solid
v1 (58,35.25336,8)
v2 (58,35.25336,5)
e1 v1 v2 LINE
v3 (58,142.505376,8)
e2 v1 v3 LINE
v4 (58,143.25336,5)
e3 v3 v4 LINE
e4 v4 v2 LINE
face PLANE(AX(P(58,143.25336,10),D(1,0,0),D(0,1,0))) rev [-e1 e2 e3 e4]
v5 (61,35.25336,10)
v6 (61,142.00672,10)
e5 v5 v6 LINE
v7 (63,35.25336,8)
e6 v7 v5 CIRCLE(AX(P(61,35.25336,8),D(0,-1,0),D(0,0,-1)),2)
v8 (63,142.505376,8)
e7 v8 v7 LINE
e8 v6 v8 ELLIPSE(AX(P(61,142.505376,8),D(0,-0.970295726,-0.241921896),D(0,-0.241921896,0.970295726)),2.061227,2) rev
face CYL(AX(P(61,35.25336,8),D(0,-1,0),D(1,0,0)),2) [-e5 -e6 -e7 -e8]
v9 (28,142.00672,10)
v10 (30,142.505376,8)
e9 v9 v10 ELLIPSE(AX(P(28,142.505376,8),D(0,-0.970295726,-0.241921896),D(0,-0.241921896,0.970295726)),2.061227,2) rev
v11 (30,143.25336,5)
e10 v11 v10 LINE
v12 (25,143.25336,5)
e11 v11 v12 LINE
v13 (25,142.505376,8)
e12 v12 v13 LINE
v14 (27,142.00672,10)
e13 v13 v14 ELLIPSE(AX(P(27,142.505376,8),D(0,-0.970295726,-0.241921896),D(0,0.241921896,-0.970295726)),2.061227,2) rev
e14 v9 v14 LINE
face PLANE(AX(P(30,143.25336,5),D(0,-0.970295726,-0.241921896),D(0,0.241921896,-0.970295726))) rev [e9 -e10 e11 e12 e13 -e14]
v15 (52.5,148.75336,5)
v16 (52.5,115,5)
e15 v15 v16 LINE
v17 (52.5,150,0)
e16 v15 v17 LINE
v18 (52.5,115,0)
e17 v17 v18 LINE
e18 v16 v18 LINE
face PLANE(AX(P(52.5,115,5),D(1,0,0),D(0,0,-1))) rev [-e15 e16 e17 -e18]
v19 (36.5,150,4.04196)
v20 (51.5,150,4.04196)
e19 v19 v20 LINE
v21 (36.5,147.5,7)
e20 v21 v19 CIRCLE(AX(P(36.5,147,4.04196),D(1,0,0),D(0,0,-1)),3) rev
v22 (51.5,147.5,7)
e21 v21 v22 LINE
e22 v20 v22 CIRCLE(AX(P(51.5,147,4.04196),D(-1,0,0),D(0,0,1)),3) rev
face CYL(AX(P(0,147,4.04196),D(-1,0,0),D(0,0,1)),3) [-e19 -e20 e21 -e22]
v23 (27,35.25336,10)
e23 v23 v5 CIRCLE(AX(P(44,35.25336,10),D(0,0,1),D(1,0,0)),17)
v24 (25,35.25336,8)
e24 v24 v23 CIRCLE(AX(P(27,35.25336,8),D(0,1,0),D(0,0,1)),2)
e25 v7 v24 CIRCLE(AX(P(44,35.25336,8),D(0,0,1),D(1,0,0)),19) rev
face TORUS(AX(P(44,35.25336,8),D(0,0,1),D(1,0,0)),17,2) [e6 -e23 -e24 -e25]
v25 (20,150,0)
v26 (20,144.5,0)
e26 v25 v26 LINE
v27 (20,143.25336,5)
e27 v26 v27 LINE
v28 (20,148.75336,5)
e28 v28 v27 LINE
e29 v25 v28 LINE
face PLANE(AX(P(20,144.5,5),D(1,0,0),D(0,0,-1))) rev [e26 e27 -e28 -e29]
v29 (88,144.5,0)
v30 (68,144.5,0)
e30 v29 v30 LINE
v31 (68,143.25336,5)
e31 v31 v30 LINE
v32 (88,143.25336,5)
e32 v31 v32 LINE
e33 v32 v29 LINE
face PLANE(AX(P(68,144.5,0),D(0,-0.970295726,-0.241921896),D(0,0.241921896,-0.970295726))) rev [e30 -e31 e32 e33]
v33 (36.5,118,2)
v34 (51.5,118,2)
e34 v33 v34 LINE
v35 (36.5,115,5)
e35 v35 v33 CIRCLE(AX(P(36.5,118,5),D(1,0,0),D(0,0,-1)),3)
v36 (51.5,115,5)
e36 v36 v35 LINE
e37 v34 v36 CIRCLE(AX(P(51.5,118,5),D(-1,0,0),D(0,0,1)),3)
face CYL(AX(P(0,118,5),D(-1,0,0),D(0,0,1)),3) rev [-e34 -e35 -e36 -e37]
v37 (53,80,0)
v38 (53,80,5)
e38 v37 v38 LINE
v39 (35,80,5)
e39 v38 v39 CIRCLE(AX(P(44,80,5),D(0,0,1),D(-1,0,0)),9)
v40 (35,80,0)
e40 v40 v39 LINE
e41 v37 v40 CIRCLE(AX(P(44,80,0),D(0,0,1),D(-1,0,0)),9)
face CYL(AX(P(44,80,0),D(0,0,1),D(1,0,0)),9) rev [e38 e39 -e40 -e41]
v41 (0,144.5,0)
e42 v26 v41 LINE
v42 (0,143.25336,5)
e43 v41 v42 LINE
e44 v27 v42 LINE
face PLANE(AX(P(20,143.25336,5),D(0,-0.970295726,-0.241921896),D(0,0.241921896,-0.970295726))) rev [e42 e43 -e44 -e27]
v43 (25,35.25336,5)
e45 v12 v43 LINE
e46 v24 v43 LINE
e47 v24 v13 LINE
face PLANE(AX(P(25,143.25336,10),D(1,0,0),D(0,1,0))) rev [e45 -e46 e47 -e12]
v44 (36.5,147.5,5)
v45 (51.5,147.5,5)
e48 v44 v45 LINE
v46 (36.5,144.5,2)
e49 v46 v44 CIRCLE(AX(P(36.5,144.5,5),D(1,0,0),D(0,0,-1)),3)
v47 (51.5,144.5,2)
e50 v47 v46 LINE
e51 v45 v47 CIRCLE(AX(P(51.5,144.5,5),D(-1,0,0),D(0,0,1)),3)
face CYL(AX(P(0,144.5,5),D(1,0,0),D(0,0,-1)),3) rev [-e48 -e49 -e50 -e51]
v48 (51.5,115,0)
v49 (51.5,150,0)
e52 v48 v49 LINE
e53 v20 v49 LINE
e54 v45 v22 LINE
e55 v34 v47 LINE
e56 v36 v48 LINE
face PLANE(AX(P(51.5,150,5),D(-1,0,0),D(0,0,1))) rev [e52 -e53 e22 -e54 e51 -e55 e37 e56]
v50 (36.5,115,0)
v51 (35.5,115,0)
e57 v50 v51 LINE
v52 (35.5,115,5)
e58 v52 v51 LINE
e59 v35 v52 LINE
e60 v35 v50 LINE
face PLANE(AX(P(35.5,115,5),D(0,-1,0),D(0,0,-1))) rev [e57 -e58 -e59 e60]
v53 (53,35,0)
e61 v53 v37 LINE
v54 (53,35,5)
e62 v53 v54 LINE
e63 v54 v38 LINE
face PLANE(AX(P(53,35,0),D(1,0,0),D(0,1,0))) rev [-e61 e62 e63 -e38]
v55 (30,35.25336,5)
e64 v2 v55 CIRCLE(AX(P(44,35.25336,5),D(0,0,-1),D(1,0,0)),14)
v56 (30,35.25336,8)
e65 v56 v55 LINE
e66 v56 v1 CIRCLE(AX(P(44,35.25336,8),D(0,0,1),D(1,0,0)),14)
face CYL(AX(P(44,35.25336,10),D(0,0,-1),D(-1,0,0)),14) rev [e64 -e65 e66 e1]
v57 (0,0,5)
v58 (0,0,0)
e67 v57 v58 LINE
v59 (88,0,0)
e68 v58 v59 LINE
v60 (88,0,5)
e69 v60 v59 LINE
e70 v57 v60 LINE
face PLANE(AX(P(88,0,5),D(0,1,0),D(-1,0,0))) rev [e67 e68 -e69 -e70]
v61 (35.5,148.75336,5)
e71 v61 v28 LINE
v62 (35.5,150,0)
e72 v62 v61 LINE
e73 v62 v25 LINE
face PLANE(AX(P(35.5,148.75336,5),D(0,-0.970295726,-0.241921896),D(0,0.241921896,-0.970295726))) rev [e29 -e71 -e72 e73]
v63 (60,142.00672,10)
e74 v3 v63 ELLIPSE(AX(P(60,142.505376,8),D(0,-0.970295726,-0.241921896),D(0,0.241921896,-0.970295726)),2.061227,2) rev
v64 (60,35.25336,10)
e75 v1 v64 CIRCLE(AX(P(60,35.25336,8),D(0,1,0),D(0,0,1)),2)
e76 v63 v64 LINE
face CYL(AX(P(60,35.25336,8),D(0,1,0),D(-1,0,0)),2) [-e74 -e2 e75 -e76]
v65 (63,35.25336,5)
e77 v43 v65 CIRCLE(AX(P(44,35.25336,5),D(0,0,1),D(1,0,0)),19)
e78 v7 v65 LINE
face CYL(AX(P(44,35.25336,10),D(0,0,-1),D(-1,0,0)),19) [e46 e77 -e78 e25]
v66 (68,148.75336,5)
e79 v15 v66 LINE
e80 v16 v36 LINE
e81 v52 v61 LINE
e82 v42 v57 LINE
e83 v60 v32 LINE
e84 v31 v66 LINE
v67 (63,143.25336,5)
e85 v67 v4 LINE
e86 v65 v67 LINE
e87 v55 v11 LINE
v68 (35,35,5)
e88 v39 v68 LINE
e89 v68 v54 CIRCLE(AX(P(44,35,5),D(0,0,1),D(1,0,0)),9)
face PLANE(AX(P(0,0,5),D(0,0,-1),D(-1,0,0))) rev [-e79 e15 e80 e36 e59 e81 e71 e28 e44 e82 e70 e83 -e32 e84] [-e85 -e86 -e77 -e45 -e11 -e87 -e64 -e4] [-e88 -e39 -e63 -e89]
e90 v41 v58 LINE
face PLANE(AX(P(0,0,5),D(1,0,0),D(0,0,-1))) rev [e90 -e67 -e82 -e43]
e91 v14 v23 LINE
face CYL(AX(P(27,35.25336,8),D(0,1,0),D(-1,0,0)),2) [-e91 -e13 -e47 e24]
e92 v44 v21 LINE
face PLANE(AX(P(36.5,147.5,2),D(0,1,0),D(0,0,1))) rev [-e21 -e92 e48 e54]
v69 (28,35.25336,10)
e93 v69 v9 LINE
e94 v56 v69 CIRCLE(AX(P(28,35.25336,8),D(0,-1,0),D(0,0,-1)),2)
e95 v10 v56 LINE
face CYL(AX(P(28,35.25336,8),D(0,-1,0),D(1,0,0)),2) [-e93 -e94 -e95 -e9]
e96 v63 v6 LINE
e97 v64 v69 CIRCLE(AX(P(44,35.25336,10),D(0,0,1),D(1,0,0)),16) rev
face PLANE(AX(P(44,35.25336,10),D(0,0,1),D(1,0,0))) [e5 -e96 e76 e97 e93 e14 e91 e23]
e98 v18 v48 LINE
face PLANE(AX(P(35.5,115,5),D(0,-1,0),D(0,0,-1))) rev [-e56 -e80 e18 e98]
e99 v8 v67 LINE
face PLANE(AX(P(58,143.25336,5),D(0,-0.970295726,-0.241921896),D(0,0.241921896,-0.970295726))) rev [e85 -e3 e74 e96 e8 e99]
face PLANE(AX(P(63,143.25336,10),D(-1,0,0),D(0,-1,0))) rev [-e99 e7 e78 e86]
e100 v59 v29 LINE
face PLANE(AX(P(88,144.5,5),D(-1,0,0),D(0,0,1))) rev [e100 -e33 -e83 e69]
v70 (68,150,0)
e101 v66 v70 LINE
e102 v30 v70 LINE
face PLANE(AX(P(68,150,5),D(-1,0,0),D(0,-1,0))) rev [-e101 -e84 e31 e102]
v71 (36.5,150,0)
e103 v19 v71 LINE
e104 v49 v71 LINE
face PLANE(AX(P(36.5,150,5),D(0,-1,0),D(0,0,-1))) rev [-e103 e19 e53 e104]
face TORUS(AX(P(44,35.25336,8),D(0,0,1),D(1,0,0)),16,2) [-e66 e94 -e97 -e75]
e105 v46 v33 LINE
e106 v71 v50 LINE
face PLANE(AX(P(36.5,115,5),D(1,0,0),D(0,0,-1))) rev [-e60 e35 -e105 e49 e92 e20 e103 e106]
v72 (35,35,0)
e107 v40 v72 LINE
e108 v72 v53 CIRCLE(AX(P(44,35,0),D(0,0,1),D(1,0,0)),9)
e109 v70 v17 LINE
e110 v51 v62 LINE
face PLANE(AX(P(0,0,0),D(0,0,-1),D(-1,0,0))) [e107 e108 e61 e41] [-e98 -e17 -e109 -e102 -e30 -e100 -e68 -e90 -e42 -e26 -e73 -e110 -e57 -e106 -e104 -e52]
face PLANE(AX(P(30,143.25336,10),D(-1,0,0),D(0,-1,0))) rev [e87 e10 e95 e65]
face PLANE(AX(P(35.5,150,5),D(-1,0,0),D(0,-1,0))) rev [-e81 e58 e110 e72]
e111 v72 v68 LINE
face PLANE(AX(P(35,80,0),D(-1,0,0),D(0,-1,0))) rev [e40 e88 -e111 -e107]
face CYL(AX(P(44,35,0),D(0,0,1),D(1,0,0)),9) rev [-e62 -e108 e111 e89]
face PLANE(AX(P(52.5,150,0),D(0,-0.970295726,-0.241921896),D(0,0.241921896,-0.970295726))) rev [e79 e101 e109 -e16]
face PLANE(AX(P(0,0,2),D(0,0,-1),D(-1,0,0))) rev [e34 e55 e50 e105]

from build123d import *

# Parameters (mm, degrees)
BOSS_EXTRUDE1_DEPTH = 5
CUT_EXTRUDE1_DEPTH  = 20
CUT_EXTRUDE2_DEPTH  = 20
CUT_EXTRUDE3_DEPTH  = 15.5
CUT_EXTRUDE4_DEPTH  = 15.5
SKETCH6_W           = 15
SKETCH6_H           = 32.5
CUT_EXTRUDE5_DEPTH  = 3
FILLET1_R           = 3
SKETCH7_W           = 15
SKETCH7_H           = 2.5
BOSS_EXTRUDE2_DEPTH = 2
FILLET2_R           = 3
FILLET3_R           = 3
CUT_EXTRUDE6_DEPTH  = 5
BOSS_EXTRUDE3_DEPTH = 5
CUT_EXTRUDE7_DEPTH  = 5
CUT_EXTRUDE8_DEPTH  = 5
FILLET4_R           = 2
FILLET5_R           = 2


# Some blends are built 0.0001 mm under size
with BuildPart() as part:
    # Sketch1 → Boss-Extrude1 (new body)
    with BuildSketch(Plane.XY):
        Polygon((0, 0), (0, 144.5), (20, 144.5), (20, 150), (35.5, 150), (35.5, 115), (36.5, 115), (36.5, 150), (51.5, 150), (51.5, 115), (52.5, 115), (52.5, 150), (68, 150), (68, 144.5), (88, 144.5), (88, 0), align=None)
    extrude(amount=BOSS_EXTRUDE1_DEPTH)

    # Sketch2 → Cut-Extrude1 (cut)
    with BuildSketch(Plane(origin=(88, 0, 0), x_dir=(0, 0, -1), z_dir=(1, 0, 0))):
        Polygon((-5, 144.5), (0, 144.5), (-5, 143.253359986), align=None)
    extrude(amount=-CUT_EXTRUDE1_DEPTH, mode=Mode.SUBTRACT)

    # Sketch3 → Cut-Extrude2 (cut)
    with BuildSketch(Plane.ZY):
        Polygon((5, 144.5), (0, 144.5), (5, 143.253359986), align=None)
    extrude(amount=-CUT_EXTRUDE2_DEPTH, mode=Mode.SUBTRACT)

    # Sketch4 → Cut-Extrude3 (cut)
    with BuildSketch(Plane(origin=(68, 0, 0), x_dir=(0, 0, -1), z_dir=(1, 0, 0))):
        Polygon((0, 150), (-5, 148.753359986), (-5, 150), align=None)
    extrude(amount=-CUT_EXTRUDE3_DEPTH, mode=Mode.SUBTRACT)

    # Sketch5 → Cut-Extrude4 (cut)
    with BuildSketch(Plane.ZY.offset(-20)):
        Polygon((0, 150), (5, 150), (5, 148.753359986), align=None)
    extrude(amount=-CUT_EXTRUDE4_DEPTH, mode=Mode.SUBTRACT)

    # Sketch6 → Cut-Extrude5 (cut)
    with BuildSketch(Plane.XY.offset(5)):
        with Locations((44, 131.25)):
            Rectangle(SKETCH6_W, SKETCH6_H)
    extrude(amount=-CUT_EXTRUDE5_DEPTH, mode=Mode.SUBTRACT)

    # Fillet1
    fillet1_edges = [part.edges().sort_by_distance(p)[0] for p in [
        (44, 115, 2),
    ]]
    fillet(fillet1_edges, radius=FILLET1_R - 0.0001)  # a hair under: the kernel refuses the full size

    # Sketch7 → Boss-Extrude2 (add)
    with BuildSketch(Plane.XY.offset(5)):
        with Locations((44, 148.75)):
            Rectangle(SKETCH7_W, SKETCH7_H)
    extrude(amount=BOSS_EXTRUDE2_DEPTH)

    # Fillet2
    fillet2_edges = [part.edges().sort_by_distance(p)[0] for p in [
        (44, 147.5, 2),
    ]]
    fillet(fillet2_edges, radius=FILLET2_R)

    # Fillet3
    # the kernel refuses this fillet: 3 mm, written as the material it takes off along each edge
    with BuildSketch(Plane(origin=(58.895099729, 150, 7), x_dir=(0, -1, 0), z_dir=(-1, 0, 0))) as fillet3_piece_1:
        with BuildLine():
            CenterArc((3, -2.958039892), FILLET3_R, 99.594068227, 80.405931773)
            Line((0, -2.958039892), (-0.06, -2.958039892))
            Line((-0.06, -2.958039892), (-0.06, 0))
            Line((-0.06, 0), (0, 0.06))
            ThreePointArc((0, 0.06), (1.25, 0.06), (2.49, 0.059160798))
            Line((2.49, 0.059160798), (2.5, 0))
        make_face()
    extrude(amount=29.790199458, mode=Mode.SUBTRACT)

    # Sketch8 → Cut-Extrude6 (cut)
    with BuildSketch(Plane.XY.offset(5)):
        with BuildLine():
            Line((35, 80), (35, 35))
            ThreePointArc((35, 35), (44, 26), (53, 35))
            Line((53, 35), (53, 80))
            ThreePointArc((53, 80), (44, 89), (35, 80))
        make_face()
    extrude(amount=-CUT_EXTRUDE6_DEPTH, mode=Mode.SUBTRACT)

    # Sketch9 → Boss-Extrude3 (add)
    with BuildSketch(Plane.XY.offset(5)):
        with BuildLine():
            Line((25, 143.253359986), (25, 35.253359986))
            ThreePointArc((25, 35.253359986), (44, 16.253359986), (63, 35.253359986))
            Line((63, 35.253359986), (63, 143.253359986))
            Line((63, 143.253359986), (58, 143.253359986))
            Line((58, 143.253359986), (58, 35.253359986))
            ThreePointArc((58, 35.253359986), (44, 21.253359986), (30, 35.253359986))
            Line((30, 35.253359986), (30, 143.253359986))
            Line((30, 143.253359986), (25, 143.253359986))
        make_face()
    extrude(amount=BOSS_EXTRUDE3_DEPTH)

    # Sketch10 → Cut-Extrude7 (cut)
    with BuildSketch(Plane.ZY.offset(-25)):
        Polygon((5, 143.253359986), (10, 142.006719972), (10, 143.253359986), align=None)
    extrude(amount=-CUT_EXTRUDE7_DEPTH, mode=Mode.SUBTRACT)

    # Sketch11 → Cut-Extrude8 (cut)
    with BuildSketch(Plane(origin=(63, 0, 0), x_dir=(0, 0, -1), z_dir=(1, 0, 0))):
        Polygon((-5, 143.253359986), (-10, 142.006719972), (-10, 143.253359986), align=None)
    extrude(amount=-CUT_EXTRUDE8_DEPTH, mode=Mode.SUBTRACT)

    # Fillet4
    fillet4_edges = [part.edges().sort_by_distance(p)[0] for p in [
        (44, 16.253359986, 10),
        (63, 88.630039979, 10),
        (25, 88.630039979, 10),
    ]]
    fillet(fillet4_edges, radius=FILLET4_R)

    # Fillet5
    fillet5_edges = [part.edges().sort_by_distance(p)[0] for p in [
        (44, 21.253359986, 10),
        (30, 88.630039979, 10),
        (58, 88.630039979, 10),
    ]]
    fillet(fillet5_edges, radius=FILLET5_R)


solid = part.part
